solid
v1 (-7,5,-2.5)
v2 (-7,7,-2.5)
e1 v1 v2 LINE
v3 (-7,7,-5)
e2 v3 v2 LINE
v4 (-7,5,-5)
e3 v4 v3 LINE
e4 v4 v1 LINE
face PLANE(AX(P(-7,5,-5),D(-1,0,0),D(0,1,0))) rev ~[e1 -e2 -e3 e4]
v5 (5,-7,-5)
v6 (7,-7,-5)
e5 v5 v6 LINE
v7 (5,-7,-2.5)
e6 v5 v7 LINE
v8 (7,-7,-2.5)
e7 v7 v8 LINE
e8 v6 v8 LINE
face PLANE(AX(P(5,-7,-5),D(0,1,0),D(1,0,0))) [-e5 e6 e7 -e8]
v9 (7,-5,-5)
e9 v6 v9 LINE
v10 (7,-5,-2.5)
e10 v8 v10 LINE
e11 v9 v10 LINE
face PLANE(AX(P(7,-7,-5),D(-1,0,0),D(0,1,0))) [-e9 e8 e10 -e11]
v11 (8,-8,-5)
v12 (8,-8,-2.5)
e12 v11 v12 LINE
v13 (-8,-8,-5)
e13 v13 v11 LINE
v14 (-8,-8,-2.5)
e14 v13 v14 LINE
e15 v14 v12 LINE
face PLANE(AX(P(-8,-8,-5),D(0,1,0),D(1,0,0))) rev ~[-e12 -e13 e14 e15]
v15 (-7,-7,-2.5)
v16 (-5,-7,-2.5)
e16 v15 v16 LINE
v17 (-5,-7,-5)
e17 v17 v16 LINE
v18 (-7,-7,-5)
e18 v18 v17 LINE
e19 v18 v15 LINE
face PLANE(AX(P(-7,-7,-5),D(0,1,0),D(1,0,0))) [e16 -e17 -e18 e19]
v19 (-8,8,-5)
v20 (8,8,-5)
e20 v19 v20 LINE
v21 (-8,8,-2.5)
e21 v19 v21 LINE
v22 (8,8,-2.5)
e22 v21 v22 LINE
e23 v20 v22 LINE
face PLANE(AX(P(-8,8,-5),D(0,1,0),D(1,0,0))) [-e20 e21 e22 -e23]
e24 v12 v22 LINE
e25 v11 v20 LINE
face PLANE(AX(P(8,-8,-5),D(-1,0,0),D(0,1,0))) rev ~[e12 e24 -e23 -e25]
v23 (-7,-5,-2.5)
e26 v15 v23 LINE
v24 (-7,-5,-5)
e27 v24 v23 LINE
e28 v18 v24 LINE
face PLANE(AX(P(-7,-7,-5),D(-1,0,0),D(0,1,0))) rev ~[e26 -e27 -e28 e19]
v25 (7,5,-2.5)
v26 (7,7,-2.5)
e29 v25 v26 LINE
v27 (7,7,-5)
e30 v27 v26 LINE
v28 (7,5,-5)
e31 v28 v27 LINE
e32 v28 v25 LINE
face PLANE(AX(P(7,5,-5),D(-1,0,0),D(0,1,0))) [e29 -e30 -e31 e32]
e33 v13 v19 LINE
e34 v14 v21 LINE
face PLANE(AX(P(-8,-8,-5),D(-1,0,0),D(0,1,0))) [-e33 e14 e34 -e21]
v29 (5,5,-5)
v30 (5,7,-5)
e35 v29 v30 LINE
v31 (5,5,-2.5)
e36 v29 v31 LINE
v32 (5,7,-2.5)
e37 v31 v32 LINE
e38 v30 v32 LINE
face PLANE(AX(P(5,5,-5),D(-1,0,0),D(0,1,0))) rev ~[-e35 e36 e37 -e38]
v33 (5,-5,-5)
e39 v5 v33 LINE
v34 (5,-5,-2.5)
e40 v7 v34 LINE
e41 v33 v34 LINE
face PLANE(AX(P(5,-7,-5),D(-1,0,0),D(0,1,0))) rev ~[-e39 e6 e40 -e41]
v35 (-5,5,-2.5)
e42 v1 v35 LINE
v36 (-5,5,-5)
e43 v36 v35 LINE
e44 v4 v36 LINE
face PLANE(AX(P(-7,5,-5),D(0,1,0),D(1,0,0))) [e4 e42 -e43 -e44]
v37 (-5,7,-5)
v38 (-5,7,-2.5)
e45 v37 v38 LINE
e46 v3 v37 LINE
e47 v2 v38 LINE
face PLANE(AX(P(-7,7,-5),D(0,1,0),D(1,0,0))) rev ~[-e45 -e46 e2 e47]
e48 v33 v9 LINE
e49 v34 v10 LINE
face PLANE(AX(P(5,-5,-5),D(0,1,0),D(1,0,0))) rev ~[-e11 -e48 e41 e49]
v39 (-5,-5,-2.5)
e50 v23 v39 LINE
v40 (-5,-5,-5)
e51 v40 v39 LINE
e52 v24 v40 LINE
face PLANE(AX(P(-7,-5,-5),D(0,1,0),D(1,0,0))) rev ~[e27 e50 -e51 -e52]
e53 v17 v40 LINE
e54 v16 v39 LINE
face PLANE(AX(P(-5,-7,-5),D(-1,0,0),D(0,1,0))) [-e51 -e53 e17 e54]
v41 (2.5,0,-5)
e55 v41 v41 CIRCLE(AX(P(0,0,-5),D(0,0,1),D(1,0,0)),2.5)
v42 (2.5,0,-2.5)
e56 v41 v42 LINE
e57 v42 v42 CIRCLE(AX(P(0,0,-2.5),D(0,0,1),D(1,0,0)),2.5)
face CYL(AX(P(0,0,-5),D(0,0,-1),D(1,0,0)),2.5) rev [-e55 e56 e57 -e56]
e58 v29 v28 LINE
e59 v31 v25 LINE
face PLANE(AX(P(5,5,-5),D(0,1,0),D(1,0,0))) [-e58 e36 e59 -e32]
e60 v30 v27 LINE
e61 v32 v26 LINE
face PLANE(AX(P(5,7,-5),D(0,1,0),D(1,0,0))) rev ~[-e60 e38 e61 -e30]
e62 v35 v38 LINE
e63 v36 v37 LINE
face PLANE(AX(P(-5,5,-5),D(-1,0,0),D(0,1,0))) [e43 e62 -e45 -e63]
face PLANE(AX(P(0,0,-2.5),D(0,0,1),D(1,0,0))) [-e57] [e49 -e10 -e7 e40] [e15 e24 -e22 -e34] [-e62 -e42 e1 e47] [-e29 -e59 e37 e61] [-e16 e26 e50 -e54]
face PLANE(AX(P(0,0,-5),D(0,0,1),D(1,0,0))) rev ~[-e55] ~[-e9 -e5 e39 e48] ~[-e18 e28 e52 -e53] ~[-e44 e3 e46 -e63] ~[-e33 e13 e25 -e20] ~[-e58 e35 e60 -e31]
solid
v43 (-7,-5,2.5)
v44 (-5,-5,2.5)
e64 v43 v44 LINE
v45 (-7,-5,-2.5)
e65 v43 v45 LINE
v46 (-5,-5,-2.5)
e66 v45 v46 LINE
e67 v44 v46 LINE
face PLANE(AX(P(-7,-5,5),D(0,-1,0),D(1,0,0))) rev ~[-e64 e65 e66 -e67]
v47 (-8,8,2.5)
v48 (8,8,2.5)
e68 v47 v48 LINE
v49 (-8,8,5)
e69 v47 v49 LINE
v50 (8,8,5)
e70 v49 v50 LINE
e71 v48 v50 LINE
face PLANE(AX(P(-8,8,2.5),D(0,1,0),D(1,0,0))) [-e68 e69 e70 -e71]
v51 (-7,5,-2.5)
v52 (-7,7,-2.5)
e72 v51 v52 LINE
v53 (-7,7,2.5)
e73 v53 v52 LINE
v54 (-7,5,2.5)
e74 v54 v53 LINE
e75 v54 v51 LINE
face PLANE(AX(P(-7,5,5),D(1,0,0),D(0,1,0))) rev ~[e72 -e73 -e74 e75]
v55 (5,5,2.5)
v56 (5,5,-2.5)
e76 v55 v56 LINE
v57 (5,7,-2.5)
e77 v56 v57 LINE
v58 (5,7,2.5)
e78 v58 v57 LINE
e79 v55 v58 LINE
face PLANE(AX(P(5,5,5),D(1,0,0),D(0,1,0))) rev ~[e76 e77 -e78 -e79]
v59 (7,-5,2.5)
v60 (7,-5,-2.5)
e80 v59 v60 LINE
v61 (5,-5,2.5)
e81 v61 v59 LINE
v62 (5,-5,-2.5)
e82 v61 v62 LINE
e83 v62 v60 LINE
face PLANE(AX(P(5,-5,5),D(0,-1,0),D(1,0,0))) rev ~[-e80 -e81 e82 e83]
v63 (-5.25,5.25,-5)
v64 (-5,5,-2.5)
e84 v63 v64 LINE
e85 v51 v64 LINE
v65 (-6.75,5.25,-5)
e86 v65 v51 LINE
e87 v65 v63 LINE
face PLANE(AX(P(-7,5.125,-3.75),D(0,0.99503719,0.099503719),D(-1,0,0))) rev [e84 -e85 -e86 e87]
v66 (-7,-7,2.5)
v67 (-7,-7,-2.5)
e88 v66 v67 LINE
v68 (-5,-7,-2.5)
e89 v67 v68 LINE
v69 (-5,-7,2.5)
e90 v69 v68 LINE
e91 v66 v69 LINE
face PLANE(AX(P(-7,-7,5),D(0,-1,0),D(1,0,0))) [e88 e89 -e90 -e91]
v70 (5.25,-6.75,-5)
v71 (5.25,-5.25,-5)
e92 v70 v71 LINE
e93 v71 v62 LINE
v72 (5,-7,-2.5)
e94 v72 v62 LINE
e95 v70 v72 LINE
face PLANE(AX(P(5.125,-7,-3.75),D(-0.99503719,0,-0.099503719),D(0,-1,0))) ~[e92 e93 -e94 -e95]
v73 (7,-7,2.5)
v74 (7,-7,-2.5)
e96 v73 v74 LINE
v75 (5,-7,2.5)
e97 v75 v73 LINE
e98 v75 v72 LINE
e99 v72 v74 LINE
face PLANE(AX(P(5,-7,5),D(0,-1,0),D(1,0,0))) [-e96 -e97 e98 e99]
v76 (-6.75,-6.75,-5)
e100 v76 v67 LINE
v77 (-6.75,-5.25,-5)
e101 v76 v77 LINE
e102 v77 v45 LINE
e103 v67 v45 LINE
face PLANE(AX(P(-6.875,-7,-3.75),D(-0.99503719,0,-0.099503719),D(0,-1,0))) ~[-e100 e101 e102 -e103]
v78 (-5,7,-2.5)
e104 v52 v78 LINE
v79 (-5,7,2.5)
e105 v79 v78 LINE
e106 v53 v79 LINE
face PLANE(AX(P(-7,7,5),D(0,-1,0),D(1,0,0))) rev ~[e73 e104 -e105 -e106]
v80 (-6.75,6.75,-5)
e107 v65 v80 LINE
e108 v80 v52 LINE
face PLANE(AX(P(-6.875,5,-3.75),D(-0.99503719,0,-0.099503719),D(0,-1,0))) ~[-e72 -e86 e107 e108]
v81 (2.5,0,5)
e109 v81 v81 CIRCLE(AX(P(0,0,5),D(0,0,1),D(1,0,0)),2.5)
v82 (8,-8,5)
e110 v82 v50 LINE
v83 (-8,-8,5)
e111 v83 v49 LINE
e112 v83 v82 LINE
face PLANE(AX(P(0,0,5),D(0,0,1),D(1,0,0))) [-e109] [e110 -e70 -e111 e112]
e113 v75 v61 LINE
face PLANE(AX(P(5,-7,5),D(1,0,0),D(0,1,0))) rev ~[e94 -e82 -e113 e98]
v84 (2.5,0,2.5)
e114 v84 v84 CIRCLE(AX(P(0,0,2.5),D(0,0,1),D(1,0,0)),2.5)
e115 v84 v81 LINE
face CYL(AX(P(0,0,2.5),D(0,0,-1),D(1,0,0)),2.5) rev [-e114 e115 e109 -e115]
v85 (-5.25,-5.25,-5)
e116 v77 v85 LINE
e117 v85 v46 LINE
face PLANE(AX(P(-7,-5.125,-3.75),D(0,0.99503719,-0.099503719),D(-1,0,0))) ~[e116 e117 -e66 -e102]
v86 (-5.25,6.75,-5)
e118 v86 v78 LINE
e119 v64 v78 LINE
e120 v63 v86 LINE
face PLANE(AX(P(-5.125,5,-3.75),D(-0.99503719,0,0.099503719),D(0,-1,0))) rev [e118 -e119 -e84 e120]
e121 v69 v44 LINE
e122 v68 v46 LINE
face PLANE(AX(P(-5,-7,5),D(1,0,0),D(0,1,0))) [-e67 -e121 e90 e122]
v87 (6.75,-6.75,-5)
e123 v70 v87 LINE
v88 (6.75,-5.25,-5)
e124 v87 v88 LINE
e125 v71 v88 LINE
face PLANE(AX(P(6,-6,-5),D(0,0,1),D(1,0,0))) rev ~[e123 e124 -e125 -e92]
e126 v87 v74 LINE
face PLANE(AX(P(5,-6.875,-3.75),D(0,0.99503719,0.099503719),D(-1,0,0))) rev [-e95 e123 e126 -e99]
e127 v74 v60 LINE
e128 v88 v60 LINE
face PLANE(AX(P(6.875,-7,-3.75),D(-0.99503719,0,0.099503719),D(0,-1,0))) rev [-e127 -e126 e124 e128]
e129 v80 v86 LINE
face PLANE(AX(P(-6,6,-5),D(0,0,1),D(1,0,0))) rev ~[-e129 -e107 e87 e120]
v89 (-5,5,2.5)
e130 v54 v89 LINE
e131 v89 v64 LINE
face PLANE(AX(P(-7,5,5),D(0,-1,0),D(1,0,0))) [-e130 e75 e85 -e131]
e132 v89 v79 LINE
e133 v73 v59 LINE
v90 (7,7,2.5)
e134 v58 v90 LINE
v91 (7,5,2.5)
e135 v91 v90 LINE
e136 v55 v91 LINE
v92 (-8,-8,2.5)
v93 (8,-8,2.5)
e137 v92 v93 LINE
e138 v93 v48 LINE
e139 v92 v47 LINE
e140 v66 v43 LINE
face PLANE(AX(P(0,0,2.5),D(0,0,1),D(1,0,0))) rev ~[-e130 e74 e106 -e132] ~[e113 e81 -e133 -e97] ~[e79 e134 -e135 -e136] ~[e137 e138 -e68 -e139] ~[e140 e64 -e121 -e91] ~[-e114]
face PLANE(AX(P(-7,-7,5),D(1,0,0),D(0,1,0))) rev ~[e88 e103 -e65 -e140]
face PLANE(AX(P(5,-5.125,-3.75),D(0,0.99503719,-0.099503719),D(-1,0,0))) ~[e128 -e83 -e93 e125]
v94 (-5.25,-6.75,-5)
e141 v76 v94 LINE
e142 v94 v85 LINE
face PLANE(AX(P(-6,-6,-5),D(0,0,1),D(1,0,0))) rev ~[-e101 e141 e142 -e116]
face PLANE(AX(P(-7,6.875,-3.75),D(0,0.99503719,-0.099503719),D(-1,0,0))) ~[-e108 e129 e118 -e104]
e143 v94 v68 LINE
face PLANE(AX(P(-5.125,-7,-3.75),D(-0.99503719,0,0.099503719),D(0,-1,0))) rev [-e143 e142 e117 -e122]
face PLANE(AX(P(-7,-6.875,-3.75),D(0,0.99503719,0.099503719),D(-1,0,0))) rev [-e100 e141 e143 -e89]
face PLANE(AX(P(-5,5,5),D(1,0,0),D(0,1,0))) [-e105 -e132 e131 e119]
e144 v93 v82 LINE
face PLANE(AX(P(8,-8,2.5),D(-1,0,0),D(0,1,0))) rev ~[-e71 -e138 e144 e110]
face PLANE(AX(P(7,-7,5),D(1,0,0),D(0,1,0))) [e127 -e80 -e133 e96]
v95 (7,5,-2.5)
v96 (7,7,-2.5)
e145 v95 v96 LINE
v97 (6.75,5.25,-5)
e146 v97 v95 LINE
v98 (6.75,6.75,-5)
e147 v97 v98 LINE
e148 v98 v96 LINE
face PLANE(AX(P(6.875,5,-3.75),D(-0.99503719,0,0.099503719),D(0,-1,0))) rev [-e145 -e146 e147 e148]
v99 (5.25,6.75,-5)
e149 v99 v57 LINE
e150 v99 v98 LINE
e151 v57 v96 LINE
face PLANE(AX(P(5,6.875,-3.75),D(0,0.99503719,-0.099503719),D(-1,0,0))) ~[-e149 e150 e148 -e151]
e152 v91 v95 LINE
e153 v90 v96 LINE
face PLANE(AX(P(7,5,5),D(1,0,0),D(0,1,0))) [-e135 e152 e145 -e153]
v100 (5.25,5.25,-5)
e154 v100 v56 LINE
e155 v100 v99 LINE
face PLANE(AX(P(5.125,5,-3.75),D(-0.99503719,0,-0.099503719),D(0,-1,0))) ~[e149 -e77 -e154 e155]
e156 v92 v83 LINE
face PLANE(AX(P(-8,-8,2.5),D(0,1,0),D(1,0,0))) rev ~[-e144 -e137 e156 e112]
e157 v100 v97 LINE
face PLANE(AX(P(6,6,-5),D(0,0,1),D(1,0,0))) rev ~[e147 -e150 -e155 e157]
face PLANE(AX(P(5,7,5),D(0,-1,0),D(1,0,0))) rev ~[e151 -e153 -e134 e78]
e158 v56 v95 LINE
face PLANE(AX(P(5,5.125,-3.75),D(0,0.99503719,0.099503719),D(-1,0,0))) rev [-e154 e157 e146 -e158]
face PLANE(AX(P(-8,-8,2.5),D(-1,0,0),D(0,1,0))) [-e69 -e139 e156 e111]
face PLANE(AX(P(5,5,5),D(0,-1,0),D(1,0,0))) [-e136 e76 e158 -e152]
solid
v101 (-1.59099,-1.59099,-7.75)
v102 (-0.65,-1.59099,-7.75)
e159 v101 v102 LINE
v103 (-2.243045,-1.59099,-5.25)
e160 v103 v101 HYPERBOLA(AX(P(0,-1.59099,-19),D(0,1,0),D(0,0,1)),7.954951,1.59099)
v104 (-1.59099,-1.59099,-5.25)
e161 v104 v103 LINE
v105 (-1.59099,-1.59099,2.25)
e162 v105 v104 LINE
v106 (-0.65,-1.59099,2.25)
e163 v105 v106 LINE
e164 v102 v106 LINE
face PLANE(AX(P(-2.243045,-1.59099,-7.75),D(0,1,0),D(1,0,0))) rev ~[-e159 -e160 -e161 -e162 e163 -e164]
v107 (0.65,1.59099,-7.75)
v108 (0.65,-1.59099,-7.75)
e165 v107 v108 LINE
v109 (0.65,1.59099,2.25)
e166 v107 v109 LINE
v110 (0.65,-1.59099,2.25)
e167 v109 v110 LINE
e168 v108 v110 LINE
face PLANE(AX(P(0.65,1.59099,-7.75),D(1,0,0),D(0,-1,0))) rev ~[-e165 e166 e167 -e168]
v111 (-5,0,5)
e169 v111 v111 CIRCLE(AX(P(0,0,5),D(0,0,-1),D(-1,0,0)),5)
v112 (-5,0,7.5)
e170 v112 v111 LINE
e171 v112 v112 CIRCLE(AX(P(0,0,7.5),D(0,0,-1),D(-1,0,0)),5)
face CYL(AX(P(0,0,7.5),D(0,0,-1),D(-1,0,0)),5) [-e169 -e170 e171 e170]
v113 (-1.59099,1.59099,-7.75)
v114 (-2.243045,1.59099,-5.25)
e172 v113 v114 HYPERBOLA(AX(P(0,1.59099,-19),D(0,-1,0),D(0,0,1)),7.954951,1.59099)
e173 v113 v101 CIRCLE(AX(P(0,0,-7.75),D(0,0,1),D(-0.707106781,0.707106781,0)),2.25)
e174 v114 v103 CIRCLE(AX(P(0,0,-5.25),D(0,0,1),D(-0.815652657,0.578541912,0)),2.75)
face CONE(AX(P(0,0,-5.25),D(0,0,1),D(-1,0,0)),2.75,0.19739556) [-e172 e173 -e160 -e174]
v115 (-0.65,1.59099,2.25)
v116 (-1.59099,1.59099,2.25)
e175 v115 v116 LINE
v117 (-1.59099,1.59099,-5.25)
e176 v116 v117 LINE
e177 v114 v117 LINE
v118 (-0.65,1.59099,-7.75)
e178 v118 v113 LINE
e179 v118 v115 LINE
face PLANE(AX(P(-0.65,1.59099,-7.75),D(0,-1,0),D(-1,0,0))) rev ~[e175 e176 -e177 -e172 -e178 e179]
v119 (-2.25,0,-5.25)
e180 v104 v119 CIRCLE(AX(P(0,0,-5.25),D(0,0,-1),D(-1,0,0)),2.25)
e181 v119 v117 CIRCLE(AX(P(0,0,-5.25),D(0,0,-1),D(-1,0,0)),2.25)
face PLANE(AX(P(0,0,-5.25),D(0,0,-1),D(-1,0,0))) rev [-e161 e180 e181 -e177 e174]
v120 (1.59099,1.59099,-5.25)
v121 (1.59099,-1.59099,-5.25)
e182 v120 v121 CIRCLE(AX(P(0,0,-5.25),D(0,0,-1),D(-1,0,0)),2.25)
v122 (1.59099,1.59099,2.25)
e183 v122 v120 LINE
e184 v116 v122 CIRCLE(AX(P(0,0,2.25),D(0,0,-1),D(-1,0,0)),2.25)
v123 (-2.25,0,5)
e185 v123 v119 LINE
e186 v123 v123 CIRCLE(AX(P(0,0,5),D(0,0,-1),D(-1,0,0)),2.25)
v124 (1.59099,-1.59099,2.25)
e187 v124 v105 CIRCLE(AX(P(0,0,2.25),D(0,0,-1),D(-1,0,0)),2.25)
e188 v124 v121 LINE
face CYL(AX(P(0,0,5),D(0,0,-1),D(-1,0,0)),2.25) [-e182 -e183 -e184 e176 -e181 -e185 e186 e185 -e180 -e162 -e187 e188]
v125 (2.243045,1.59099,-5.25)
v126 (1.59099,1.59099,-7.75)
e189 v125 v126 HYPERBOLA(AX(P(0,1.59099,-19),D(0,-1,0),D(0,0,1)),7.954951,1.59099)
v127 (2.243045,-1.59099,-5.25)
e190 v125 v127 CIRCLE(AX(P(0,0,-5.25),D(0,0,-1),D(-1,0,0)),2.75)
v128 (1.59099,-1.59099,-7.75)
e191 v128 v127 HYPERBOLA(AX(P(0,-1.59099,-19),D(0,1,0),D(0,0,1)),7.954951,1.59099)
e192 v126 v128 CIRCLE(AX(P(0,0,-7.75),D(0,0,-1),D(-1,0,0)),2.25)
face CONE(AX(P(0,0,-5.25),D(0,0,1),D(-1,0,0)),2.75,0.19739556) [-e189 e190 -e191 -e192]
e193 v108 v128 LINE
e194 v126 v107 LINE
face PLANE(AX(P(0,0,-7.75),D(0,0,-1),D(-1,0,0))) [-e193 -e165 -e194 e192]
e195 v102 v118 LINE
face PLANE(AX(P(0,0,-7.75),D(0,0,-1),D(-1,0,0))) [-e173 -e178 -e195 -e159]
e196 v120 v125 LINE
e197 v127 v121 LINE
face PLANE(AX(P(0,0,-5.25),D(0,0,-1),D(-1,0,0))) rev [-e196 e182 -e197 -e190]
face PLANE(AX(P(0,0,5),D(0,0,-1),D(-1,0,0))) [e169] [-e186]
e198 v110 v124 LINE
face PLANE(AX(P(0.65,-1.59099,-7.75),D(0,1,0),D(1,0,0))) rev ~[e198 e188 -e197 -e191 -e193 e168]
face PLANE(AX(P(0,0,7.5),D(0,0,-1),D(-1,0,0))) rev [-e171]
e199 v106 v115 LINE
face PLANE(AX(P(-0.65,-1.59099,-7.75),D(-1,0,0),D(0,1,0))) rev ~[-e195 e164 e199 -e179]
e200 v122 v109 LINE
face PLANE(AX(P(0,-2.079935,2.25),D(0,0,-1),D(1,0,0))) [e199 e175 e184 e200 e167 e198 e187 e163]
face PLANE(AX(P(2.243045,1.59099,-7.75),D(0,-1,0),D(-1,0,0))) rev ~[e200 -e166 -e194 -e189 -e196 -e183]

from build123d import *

# Parameters (mm, degrees)
F3_W      = 16
F3_H      = 16
F3_W_2    = 2
F3_H_2    = 2
F3_R      = 2.5
F4_DEPTH  = 2.5
F6_W      = 2
F6_H      = 2
F7_DEPTH  = 10
F11_DEPTH = 10
F12_SIZE2 = 2.5
F12_SIZE  = 0.25
F13_SIZE2 = 2.5
F13_SIZE  = 0.25
F14_SIZE2 = 2.5
F14_SIZE  = 0.25
F15_SIZE2 = 2.5
F15_SIZE  = 0.25


with BuildPart() as f4:
    # F3 (on offset) → F4 (new body)
    with BuildSketch(Plane.XY.offset(2.5)):
        Rectangle(F3_W, F3_H)
        with Locations((-6, -6)):
            Rectangle(F3_W_2, F3_H_2, mode=Mode.SUBTRACT)
        with Locations((6, -6)):
            Rectangle(F3_W_2, F3_H_2, mode=Mode.SUBTRACT)
        with Locations((-6, 6)):
            Rectangle(F3_W_2, F3_H_2, mode=Mode.SUBTRACT)
        Circle(F3_R, mode=Mode.SUBTRACT)
        with Locations((6, 6)):
            Rectangle(F3_W_2, F3_H_2, mode=Mode.SUBTRACT)
    extrude(amount=F4_DEPTH)


with BuildPart() as f5_1:
    # F5: copy of F4
    add(f4.part.moved(Location((0, 0, -7.5))))


with BuildPart() as f4_1:
    add(f4.part)

    # F6 (on face) → F7 (join)
    with BuildSketch(Plane.XY.offset(5)):
        with Locations((-6, -6)):
            Rectangle(F6_W, F6_H)
        with Locations((-6, 6)):
            Rectangle(F6_W, F6_H)
        with Locations((6, 6)):
            Rectangle(F6_W, F6_H)
        with Locations((6, -6)):
            Rectangle(F6_W, F6_H)
    extrude(amount=-F7_DEPTH)

    # F12
    f12_edges = [f4_1.edges().sort_by_distance(p)[0] for p in [
        (6, -7, -5),
        (7, -6, -5),
        (6, -5, -5),
        (5, -6, -5),
    ]]
    f12_side = f4_1.faces().sort_by_distance((6, -6, -5))[0]
    chamfer(f12_edges, length=F12_SIZE, length2=F12_SIZE2, reference=f12_side)

    # F13
    f13_edges = [f4_1.edges().sort_by_distance(p)[0] for p in [
        (6, 5, -5),
        (7, 6, -5),
        (6, 7, -5),
        (5, 6, -5),
    ]]
    f13_side = f4_1.faces().sort_by_distance((6, 6, -5))[0]
    chamfer(f13_edges, length=F13_SIZE, length2=F13_SIZE2, reference=f13_side)

    # F14
    f14_edges = [f4_1.edges().sort_by_distance(p)[0] for p in [
        (-6, 5, -5),
        (-5, 6, -5),
        (-6, 7, -5),
        (-7, 6, -5),
    ]]
    f14_side = f4_1.faces().sort_by_distance((-6, 6, -5))[0]
    chamfer(f14_edges, length=F14_SIZE, length2=F14_SIZE2, reference=f14_side)

    # F15
    f15_edges = [f4_1.edges().sort_by_distance(p)[0] for p in [
        (-6, -7, -5),
        (-5, -6, -5),
        (-6, -5, -5),
        (-7, -6, -5),
    ]]
    f15_side = f4_1.faces().sort_by_distance((-6, -6, -5))[0]
    chamfer(f15_edges, length=F15_SIZE, length2=F15_SIZE2, reference=f15_side)


with BuildPart() as f9:
    # F8 (on Front) → F9 (revolve)
    with BuildSketch(Plane.XZ):
        Polygon((0, -7.75), (0, 7.5), (-5, 7.5), (-5, 5), (-2.25, 5), (-2.25, -5.25), (-2.75, -5.25), (-2.25, -7.75), align=None)
    revolve(axis=Axis((0, 0, -0.0427132472), (0, 0, -1)))

    # F10 (on face) → F11 (cut)
    with BuildSketch(Plane(origin=(0, 0, -7.75), x_dir=(1, 0, 0), z_dir=(0, 0, -1))):
        with BuildLine():
            Line((1.5909902577, 1.5909902577), (2.2430448056, 1.5909902577))
            ThreePointArc((2.2430448056, 1.5909902577), (0, 2.75), (-2.2430448056, 1.5909902577))
            Line((-2.2430448056, 1.5909902577), (-1.5909902577, 1.5909902577))
            ThreePointArc((-1.5909902577, 1.5909902577), (0, 2.25), (1.5909902577, 1.5909902577))
        make_face()
        with BuildLine():
            Line((0.65, 1.5909902577), (1.5909902577, 1.5909902577))
            ThreePointArc((1.5909902577, 1.5909902577), (0, 2.25), (-1.5909902577, 1.5909902577))
            Line((-1.5909902577, 1.5909902577), (-0.65, 1.5909902577))
            Line((-0.65, 1.5909902577), (-0.65, -1.5909902577))
            Line((-0.65, -1.5909902577), (-1.5909902577, -1.5909902577))
            ThreePointArc((-1.5909902577, -1.5909902577), (0, -2.25), (1.5909902577, -1.5909902577))
            Line((1.5909902577, -1.5909902577), (0.65, -1.5909902577))
            Line((0.65, -1.5909902577), (0.65, 1.5909902577))
        make_face()
        with BuildLine():
            ThreePointArc((-2.2430448056, -1.5909902577), (0, -2.75), (2.2430448056, -1.5909902577))
            Line((2.2430448056, -1.5909902577), (1.5909902577, -1.5909902577))
            ThreePointArc((1.5909902577, -1.5909902577), (0, -2.25), (-1.5909902577, -1.5909902577))
            Line((-1.5909902577, -1.5909902577), (-2.2430448056, -1.5909902577))
        make_face()
    extrude(amount=-F11_DEPTH, mode=Mode.SUBTRACT)


solid = Compound([f5_1.part, f4_1.part, f9.part])
